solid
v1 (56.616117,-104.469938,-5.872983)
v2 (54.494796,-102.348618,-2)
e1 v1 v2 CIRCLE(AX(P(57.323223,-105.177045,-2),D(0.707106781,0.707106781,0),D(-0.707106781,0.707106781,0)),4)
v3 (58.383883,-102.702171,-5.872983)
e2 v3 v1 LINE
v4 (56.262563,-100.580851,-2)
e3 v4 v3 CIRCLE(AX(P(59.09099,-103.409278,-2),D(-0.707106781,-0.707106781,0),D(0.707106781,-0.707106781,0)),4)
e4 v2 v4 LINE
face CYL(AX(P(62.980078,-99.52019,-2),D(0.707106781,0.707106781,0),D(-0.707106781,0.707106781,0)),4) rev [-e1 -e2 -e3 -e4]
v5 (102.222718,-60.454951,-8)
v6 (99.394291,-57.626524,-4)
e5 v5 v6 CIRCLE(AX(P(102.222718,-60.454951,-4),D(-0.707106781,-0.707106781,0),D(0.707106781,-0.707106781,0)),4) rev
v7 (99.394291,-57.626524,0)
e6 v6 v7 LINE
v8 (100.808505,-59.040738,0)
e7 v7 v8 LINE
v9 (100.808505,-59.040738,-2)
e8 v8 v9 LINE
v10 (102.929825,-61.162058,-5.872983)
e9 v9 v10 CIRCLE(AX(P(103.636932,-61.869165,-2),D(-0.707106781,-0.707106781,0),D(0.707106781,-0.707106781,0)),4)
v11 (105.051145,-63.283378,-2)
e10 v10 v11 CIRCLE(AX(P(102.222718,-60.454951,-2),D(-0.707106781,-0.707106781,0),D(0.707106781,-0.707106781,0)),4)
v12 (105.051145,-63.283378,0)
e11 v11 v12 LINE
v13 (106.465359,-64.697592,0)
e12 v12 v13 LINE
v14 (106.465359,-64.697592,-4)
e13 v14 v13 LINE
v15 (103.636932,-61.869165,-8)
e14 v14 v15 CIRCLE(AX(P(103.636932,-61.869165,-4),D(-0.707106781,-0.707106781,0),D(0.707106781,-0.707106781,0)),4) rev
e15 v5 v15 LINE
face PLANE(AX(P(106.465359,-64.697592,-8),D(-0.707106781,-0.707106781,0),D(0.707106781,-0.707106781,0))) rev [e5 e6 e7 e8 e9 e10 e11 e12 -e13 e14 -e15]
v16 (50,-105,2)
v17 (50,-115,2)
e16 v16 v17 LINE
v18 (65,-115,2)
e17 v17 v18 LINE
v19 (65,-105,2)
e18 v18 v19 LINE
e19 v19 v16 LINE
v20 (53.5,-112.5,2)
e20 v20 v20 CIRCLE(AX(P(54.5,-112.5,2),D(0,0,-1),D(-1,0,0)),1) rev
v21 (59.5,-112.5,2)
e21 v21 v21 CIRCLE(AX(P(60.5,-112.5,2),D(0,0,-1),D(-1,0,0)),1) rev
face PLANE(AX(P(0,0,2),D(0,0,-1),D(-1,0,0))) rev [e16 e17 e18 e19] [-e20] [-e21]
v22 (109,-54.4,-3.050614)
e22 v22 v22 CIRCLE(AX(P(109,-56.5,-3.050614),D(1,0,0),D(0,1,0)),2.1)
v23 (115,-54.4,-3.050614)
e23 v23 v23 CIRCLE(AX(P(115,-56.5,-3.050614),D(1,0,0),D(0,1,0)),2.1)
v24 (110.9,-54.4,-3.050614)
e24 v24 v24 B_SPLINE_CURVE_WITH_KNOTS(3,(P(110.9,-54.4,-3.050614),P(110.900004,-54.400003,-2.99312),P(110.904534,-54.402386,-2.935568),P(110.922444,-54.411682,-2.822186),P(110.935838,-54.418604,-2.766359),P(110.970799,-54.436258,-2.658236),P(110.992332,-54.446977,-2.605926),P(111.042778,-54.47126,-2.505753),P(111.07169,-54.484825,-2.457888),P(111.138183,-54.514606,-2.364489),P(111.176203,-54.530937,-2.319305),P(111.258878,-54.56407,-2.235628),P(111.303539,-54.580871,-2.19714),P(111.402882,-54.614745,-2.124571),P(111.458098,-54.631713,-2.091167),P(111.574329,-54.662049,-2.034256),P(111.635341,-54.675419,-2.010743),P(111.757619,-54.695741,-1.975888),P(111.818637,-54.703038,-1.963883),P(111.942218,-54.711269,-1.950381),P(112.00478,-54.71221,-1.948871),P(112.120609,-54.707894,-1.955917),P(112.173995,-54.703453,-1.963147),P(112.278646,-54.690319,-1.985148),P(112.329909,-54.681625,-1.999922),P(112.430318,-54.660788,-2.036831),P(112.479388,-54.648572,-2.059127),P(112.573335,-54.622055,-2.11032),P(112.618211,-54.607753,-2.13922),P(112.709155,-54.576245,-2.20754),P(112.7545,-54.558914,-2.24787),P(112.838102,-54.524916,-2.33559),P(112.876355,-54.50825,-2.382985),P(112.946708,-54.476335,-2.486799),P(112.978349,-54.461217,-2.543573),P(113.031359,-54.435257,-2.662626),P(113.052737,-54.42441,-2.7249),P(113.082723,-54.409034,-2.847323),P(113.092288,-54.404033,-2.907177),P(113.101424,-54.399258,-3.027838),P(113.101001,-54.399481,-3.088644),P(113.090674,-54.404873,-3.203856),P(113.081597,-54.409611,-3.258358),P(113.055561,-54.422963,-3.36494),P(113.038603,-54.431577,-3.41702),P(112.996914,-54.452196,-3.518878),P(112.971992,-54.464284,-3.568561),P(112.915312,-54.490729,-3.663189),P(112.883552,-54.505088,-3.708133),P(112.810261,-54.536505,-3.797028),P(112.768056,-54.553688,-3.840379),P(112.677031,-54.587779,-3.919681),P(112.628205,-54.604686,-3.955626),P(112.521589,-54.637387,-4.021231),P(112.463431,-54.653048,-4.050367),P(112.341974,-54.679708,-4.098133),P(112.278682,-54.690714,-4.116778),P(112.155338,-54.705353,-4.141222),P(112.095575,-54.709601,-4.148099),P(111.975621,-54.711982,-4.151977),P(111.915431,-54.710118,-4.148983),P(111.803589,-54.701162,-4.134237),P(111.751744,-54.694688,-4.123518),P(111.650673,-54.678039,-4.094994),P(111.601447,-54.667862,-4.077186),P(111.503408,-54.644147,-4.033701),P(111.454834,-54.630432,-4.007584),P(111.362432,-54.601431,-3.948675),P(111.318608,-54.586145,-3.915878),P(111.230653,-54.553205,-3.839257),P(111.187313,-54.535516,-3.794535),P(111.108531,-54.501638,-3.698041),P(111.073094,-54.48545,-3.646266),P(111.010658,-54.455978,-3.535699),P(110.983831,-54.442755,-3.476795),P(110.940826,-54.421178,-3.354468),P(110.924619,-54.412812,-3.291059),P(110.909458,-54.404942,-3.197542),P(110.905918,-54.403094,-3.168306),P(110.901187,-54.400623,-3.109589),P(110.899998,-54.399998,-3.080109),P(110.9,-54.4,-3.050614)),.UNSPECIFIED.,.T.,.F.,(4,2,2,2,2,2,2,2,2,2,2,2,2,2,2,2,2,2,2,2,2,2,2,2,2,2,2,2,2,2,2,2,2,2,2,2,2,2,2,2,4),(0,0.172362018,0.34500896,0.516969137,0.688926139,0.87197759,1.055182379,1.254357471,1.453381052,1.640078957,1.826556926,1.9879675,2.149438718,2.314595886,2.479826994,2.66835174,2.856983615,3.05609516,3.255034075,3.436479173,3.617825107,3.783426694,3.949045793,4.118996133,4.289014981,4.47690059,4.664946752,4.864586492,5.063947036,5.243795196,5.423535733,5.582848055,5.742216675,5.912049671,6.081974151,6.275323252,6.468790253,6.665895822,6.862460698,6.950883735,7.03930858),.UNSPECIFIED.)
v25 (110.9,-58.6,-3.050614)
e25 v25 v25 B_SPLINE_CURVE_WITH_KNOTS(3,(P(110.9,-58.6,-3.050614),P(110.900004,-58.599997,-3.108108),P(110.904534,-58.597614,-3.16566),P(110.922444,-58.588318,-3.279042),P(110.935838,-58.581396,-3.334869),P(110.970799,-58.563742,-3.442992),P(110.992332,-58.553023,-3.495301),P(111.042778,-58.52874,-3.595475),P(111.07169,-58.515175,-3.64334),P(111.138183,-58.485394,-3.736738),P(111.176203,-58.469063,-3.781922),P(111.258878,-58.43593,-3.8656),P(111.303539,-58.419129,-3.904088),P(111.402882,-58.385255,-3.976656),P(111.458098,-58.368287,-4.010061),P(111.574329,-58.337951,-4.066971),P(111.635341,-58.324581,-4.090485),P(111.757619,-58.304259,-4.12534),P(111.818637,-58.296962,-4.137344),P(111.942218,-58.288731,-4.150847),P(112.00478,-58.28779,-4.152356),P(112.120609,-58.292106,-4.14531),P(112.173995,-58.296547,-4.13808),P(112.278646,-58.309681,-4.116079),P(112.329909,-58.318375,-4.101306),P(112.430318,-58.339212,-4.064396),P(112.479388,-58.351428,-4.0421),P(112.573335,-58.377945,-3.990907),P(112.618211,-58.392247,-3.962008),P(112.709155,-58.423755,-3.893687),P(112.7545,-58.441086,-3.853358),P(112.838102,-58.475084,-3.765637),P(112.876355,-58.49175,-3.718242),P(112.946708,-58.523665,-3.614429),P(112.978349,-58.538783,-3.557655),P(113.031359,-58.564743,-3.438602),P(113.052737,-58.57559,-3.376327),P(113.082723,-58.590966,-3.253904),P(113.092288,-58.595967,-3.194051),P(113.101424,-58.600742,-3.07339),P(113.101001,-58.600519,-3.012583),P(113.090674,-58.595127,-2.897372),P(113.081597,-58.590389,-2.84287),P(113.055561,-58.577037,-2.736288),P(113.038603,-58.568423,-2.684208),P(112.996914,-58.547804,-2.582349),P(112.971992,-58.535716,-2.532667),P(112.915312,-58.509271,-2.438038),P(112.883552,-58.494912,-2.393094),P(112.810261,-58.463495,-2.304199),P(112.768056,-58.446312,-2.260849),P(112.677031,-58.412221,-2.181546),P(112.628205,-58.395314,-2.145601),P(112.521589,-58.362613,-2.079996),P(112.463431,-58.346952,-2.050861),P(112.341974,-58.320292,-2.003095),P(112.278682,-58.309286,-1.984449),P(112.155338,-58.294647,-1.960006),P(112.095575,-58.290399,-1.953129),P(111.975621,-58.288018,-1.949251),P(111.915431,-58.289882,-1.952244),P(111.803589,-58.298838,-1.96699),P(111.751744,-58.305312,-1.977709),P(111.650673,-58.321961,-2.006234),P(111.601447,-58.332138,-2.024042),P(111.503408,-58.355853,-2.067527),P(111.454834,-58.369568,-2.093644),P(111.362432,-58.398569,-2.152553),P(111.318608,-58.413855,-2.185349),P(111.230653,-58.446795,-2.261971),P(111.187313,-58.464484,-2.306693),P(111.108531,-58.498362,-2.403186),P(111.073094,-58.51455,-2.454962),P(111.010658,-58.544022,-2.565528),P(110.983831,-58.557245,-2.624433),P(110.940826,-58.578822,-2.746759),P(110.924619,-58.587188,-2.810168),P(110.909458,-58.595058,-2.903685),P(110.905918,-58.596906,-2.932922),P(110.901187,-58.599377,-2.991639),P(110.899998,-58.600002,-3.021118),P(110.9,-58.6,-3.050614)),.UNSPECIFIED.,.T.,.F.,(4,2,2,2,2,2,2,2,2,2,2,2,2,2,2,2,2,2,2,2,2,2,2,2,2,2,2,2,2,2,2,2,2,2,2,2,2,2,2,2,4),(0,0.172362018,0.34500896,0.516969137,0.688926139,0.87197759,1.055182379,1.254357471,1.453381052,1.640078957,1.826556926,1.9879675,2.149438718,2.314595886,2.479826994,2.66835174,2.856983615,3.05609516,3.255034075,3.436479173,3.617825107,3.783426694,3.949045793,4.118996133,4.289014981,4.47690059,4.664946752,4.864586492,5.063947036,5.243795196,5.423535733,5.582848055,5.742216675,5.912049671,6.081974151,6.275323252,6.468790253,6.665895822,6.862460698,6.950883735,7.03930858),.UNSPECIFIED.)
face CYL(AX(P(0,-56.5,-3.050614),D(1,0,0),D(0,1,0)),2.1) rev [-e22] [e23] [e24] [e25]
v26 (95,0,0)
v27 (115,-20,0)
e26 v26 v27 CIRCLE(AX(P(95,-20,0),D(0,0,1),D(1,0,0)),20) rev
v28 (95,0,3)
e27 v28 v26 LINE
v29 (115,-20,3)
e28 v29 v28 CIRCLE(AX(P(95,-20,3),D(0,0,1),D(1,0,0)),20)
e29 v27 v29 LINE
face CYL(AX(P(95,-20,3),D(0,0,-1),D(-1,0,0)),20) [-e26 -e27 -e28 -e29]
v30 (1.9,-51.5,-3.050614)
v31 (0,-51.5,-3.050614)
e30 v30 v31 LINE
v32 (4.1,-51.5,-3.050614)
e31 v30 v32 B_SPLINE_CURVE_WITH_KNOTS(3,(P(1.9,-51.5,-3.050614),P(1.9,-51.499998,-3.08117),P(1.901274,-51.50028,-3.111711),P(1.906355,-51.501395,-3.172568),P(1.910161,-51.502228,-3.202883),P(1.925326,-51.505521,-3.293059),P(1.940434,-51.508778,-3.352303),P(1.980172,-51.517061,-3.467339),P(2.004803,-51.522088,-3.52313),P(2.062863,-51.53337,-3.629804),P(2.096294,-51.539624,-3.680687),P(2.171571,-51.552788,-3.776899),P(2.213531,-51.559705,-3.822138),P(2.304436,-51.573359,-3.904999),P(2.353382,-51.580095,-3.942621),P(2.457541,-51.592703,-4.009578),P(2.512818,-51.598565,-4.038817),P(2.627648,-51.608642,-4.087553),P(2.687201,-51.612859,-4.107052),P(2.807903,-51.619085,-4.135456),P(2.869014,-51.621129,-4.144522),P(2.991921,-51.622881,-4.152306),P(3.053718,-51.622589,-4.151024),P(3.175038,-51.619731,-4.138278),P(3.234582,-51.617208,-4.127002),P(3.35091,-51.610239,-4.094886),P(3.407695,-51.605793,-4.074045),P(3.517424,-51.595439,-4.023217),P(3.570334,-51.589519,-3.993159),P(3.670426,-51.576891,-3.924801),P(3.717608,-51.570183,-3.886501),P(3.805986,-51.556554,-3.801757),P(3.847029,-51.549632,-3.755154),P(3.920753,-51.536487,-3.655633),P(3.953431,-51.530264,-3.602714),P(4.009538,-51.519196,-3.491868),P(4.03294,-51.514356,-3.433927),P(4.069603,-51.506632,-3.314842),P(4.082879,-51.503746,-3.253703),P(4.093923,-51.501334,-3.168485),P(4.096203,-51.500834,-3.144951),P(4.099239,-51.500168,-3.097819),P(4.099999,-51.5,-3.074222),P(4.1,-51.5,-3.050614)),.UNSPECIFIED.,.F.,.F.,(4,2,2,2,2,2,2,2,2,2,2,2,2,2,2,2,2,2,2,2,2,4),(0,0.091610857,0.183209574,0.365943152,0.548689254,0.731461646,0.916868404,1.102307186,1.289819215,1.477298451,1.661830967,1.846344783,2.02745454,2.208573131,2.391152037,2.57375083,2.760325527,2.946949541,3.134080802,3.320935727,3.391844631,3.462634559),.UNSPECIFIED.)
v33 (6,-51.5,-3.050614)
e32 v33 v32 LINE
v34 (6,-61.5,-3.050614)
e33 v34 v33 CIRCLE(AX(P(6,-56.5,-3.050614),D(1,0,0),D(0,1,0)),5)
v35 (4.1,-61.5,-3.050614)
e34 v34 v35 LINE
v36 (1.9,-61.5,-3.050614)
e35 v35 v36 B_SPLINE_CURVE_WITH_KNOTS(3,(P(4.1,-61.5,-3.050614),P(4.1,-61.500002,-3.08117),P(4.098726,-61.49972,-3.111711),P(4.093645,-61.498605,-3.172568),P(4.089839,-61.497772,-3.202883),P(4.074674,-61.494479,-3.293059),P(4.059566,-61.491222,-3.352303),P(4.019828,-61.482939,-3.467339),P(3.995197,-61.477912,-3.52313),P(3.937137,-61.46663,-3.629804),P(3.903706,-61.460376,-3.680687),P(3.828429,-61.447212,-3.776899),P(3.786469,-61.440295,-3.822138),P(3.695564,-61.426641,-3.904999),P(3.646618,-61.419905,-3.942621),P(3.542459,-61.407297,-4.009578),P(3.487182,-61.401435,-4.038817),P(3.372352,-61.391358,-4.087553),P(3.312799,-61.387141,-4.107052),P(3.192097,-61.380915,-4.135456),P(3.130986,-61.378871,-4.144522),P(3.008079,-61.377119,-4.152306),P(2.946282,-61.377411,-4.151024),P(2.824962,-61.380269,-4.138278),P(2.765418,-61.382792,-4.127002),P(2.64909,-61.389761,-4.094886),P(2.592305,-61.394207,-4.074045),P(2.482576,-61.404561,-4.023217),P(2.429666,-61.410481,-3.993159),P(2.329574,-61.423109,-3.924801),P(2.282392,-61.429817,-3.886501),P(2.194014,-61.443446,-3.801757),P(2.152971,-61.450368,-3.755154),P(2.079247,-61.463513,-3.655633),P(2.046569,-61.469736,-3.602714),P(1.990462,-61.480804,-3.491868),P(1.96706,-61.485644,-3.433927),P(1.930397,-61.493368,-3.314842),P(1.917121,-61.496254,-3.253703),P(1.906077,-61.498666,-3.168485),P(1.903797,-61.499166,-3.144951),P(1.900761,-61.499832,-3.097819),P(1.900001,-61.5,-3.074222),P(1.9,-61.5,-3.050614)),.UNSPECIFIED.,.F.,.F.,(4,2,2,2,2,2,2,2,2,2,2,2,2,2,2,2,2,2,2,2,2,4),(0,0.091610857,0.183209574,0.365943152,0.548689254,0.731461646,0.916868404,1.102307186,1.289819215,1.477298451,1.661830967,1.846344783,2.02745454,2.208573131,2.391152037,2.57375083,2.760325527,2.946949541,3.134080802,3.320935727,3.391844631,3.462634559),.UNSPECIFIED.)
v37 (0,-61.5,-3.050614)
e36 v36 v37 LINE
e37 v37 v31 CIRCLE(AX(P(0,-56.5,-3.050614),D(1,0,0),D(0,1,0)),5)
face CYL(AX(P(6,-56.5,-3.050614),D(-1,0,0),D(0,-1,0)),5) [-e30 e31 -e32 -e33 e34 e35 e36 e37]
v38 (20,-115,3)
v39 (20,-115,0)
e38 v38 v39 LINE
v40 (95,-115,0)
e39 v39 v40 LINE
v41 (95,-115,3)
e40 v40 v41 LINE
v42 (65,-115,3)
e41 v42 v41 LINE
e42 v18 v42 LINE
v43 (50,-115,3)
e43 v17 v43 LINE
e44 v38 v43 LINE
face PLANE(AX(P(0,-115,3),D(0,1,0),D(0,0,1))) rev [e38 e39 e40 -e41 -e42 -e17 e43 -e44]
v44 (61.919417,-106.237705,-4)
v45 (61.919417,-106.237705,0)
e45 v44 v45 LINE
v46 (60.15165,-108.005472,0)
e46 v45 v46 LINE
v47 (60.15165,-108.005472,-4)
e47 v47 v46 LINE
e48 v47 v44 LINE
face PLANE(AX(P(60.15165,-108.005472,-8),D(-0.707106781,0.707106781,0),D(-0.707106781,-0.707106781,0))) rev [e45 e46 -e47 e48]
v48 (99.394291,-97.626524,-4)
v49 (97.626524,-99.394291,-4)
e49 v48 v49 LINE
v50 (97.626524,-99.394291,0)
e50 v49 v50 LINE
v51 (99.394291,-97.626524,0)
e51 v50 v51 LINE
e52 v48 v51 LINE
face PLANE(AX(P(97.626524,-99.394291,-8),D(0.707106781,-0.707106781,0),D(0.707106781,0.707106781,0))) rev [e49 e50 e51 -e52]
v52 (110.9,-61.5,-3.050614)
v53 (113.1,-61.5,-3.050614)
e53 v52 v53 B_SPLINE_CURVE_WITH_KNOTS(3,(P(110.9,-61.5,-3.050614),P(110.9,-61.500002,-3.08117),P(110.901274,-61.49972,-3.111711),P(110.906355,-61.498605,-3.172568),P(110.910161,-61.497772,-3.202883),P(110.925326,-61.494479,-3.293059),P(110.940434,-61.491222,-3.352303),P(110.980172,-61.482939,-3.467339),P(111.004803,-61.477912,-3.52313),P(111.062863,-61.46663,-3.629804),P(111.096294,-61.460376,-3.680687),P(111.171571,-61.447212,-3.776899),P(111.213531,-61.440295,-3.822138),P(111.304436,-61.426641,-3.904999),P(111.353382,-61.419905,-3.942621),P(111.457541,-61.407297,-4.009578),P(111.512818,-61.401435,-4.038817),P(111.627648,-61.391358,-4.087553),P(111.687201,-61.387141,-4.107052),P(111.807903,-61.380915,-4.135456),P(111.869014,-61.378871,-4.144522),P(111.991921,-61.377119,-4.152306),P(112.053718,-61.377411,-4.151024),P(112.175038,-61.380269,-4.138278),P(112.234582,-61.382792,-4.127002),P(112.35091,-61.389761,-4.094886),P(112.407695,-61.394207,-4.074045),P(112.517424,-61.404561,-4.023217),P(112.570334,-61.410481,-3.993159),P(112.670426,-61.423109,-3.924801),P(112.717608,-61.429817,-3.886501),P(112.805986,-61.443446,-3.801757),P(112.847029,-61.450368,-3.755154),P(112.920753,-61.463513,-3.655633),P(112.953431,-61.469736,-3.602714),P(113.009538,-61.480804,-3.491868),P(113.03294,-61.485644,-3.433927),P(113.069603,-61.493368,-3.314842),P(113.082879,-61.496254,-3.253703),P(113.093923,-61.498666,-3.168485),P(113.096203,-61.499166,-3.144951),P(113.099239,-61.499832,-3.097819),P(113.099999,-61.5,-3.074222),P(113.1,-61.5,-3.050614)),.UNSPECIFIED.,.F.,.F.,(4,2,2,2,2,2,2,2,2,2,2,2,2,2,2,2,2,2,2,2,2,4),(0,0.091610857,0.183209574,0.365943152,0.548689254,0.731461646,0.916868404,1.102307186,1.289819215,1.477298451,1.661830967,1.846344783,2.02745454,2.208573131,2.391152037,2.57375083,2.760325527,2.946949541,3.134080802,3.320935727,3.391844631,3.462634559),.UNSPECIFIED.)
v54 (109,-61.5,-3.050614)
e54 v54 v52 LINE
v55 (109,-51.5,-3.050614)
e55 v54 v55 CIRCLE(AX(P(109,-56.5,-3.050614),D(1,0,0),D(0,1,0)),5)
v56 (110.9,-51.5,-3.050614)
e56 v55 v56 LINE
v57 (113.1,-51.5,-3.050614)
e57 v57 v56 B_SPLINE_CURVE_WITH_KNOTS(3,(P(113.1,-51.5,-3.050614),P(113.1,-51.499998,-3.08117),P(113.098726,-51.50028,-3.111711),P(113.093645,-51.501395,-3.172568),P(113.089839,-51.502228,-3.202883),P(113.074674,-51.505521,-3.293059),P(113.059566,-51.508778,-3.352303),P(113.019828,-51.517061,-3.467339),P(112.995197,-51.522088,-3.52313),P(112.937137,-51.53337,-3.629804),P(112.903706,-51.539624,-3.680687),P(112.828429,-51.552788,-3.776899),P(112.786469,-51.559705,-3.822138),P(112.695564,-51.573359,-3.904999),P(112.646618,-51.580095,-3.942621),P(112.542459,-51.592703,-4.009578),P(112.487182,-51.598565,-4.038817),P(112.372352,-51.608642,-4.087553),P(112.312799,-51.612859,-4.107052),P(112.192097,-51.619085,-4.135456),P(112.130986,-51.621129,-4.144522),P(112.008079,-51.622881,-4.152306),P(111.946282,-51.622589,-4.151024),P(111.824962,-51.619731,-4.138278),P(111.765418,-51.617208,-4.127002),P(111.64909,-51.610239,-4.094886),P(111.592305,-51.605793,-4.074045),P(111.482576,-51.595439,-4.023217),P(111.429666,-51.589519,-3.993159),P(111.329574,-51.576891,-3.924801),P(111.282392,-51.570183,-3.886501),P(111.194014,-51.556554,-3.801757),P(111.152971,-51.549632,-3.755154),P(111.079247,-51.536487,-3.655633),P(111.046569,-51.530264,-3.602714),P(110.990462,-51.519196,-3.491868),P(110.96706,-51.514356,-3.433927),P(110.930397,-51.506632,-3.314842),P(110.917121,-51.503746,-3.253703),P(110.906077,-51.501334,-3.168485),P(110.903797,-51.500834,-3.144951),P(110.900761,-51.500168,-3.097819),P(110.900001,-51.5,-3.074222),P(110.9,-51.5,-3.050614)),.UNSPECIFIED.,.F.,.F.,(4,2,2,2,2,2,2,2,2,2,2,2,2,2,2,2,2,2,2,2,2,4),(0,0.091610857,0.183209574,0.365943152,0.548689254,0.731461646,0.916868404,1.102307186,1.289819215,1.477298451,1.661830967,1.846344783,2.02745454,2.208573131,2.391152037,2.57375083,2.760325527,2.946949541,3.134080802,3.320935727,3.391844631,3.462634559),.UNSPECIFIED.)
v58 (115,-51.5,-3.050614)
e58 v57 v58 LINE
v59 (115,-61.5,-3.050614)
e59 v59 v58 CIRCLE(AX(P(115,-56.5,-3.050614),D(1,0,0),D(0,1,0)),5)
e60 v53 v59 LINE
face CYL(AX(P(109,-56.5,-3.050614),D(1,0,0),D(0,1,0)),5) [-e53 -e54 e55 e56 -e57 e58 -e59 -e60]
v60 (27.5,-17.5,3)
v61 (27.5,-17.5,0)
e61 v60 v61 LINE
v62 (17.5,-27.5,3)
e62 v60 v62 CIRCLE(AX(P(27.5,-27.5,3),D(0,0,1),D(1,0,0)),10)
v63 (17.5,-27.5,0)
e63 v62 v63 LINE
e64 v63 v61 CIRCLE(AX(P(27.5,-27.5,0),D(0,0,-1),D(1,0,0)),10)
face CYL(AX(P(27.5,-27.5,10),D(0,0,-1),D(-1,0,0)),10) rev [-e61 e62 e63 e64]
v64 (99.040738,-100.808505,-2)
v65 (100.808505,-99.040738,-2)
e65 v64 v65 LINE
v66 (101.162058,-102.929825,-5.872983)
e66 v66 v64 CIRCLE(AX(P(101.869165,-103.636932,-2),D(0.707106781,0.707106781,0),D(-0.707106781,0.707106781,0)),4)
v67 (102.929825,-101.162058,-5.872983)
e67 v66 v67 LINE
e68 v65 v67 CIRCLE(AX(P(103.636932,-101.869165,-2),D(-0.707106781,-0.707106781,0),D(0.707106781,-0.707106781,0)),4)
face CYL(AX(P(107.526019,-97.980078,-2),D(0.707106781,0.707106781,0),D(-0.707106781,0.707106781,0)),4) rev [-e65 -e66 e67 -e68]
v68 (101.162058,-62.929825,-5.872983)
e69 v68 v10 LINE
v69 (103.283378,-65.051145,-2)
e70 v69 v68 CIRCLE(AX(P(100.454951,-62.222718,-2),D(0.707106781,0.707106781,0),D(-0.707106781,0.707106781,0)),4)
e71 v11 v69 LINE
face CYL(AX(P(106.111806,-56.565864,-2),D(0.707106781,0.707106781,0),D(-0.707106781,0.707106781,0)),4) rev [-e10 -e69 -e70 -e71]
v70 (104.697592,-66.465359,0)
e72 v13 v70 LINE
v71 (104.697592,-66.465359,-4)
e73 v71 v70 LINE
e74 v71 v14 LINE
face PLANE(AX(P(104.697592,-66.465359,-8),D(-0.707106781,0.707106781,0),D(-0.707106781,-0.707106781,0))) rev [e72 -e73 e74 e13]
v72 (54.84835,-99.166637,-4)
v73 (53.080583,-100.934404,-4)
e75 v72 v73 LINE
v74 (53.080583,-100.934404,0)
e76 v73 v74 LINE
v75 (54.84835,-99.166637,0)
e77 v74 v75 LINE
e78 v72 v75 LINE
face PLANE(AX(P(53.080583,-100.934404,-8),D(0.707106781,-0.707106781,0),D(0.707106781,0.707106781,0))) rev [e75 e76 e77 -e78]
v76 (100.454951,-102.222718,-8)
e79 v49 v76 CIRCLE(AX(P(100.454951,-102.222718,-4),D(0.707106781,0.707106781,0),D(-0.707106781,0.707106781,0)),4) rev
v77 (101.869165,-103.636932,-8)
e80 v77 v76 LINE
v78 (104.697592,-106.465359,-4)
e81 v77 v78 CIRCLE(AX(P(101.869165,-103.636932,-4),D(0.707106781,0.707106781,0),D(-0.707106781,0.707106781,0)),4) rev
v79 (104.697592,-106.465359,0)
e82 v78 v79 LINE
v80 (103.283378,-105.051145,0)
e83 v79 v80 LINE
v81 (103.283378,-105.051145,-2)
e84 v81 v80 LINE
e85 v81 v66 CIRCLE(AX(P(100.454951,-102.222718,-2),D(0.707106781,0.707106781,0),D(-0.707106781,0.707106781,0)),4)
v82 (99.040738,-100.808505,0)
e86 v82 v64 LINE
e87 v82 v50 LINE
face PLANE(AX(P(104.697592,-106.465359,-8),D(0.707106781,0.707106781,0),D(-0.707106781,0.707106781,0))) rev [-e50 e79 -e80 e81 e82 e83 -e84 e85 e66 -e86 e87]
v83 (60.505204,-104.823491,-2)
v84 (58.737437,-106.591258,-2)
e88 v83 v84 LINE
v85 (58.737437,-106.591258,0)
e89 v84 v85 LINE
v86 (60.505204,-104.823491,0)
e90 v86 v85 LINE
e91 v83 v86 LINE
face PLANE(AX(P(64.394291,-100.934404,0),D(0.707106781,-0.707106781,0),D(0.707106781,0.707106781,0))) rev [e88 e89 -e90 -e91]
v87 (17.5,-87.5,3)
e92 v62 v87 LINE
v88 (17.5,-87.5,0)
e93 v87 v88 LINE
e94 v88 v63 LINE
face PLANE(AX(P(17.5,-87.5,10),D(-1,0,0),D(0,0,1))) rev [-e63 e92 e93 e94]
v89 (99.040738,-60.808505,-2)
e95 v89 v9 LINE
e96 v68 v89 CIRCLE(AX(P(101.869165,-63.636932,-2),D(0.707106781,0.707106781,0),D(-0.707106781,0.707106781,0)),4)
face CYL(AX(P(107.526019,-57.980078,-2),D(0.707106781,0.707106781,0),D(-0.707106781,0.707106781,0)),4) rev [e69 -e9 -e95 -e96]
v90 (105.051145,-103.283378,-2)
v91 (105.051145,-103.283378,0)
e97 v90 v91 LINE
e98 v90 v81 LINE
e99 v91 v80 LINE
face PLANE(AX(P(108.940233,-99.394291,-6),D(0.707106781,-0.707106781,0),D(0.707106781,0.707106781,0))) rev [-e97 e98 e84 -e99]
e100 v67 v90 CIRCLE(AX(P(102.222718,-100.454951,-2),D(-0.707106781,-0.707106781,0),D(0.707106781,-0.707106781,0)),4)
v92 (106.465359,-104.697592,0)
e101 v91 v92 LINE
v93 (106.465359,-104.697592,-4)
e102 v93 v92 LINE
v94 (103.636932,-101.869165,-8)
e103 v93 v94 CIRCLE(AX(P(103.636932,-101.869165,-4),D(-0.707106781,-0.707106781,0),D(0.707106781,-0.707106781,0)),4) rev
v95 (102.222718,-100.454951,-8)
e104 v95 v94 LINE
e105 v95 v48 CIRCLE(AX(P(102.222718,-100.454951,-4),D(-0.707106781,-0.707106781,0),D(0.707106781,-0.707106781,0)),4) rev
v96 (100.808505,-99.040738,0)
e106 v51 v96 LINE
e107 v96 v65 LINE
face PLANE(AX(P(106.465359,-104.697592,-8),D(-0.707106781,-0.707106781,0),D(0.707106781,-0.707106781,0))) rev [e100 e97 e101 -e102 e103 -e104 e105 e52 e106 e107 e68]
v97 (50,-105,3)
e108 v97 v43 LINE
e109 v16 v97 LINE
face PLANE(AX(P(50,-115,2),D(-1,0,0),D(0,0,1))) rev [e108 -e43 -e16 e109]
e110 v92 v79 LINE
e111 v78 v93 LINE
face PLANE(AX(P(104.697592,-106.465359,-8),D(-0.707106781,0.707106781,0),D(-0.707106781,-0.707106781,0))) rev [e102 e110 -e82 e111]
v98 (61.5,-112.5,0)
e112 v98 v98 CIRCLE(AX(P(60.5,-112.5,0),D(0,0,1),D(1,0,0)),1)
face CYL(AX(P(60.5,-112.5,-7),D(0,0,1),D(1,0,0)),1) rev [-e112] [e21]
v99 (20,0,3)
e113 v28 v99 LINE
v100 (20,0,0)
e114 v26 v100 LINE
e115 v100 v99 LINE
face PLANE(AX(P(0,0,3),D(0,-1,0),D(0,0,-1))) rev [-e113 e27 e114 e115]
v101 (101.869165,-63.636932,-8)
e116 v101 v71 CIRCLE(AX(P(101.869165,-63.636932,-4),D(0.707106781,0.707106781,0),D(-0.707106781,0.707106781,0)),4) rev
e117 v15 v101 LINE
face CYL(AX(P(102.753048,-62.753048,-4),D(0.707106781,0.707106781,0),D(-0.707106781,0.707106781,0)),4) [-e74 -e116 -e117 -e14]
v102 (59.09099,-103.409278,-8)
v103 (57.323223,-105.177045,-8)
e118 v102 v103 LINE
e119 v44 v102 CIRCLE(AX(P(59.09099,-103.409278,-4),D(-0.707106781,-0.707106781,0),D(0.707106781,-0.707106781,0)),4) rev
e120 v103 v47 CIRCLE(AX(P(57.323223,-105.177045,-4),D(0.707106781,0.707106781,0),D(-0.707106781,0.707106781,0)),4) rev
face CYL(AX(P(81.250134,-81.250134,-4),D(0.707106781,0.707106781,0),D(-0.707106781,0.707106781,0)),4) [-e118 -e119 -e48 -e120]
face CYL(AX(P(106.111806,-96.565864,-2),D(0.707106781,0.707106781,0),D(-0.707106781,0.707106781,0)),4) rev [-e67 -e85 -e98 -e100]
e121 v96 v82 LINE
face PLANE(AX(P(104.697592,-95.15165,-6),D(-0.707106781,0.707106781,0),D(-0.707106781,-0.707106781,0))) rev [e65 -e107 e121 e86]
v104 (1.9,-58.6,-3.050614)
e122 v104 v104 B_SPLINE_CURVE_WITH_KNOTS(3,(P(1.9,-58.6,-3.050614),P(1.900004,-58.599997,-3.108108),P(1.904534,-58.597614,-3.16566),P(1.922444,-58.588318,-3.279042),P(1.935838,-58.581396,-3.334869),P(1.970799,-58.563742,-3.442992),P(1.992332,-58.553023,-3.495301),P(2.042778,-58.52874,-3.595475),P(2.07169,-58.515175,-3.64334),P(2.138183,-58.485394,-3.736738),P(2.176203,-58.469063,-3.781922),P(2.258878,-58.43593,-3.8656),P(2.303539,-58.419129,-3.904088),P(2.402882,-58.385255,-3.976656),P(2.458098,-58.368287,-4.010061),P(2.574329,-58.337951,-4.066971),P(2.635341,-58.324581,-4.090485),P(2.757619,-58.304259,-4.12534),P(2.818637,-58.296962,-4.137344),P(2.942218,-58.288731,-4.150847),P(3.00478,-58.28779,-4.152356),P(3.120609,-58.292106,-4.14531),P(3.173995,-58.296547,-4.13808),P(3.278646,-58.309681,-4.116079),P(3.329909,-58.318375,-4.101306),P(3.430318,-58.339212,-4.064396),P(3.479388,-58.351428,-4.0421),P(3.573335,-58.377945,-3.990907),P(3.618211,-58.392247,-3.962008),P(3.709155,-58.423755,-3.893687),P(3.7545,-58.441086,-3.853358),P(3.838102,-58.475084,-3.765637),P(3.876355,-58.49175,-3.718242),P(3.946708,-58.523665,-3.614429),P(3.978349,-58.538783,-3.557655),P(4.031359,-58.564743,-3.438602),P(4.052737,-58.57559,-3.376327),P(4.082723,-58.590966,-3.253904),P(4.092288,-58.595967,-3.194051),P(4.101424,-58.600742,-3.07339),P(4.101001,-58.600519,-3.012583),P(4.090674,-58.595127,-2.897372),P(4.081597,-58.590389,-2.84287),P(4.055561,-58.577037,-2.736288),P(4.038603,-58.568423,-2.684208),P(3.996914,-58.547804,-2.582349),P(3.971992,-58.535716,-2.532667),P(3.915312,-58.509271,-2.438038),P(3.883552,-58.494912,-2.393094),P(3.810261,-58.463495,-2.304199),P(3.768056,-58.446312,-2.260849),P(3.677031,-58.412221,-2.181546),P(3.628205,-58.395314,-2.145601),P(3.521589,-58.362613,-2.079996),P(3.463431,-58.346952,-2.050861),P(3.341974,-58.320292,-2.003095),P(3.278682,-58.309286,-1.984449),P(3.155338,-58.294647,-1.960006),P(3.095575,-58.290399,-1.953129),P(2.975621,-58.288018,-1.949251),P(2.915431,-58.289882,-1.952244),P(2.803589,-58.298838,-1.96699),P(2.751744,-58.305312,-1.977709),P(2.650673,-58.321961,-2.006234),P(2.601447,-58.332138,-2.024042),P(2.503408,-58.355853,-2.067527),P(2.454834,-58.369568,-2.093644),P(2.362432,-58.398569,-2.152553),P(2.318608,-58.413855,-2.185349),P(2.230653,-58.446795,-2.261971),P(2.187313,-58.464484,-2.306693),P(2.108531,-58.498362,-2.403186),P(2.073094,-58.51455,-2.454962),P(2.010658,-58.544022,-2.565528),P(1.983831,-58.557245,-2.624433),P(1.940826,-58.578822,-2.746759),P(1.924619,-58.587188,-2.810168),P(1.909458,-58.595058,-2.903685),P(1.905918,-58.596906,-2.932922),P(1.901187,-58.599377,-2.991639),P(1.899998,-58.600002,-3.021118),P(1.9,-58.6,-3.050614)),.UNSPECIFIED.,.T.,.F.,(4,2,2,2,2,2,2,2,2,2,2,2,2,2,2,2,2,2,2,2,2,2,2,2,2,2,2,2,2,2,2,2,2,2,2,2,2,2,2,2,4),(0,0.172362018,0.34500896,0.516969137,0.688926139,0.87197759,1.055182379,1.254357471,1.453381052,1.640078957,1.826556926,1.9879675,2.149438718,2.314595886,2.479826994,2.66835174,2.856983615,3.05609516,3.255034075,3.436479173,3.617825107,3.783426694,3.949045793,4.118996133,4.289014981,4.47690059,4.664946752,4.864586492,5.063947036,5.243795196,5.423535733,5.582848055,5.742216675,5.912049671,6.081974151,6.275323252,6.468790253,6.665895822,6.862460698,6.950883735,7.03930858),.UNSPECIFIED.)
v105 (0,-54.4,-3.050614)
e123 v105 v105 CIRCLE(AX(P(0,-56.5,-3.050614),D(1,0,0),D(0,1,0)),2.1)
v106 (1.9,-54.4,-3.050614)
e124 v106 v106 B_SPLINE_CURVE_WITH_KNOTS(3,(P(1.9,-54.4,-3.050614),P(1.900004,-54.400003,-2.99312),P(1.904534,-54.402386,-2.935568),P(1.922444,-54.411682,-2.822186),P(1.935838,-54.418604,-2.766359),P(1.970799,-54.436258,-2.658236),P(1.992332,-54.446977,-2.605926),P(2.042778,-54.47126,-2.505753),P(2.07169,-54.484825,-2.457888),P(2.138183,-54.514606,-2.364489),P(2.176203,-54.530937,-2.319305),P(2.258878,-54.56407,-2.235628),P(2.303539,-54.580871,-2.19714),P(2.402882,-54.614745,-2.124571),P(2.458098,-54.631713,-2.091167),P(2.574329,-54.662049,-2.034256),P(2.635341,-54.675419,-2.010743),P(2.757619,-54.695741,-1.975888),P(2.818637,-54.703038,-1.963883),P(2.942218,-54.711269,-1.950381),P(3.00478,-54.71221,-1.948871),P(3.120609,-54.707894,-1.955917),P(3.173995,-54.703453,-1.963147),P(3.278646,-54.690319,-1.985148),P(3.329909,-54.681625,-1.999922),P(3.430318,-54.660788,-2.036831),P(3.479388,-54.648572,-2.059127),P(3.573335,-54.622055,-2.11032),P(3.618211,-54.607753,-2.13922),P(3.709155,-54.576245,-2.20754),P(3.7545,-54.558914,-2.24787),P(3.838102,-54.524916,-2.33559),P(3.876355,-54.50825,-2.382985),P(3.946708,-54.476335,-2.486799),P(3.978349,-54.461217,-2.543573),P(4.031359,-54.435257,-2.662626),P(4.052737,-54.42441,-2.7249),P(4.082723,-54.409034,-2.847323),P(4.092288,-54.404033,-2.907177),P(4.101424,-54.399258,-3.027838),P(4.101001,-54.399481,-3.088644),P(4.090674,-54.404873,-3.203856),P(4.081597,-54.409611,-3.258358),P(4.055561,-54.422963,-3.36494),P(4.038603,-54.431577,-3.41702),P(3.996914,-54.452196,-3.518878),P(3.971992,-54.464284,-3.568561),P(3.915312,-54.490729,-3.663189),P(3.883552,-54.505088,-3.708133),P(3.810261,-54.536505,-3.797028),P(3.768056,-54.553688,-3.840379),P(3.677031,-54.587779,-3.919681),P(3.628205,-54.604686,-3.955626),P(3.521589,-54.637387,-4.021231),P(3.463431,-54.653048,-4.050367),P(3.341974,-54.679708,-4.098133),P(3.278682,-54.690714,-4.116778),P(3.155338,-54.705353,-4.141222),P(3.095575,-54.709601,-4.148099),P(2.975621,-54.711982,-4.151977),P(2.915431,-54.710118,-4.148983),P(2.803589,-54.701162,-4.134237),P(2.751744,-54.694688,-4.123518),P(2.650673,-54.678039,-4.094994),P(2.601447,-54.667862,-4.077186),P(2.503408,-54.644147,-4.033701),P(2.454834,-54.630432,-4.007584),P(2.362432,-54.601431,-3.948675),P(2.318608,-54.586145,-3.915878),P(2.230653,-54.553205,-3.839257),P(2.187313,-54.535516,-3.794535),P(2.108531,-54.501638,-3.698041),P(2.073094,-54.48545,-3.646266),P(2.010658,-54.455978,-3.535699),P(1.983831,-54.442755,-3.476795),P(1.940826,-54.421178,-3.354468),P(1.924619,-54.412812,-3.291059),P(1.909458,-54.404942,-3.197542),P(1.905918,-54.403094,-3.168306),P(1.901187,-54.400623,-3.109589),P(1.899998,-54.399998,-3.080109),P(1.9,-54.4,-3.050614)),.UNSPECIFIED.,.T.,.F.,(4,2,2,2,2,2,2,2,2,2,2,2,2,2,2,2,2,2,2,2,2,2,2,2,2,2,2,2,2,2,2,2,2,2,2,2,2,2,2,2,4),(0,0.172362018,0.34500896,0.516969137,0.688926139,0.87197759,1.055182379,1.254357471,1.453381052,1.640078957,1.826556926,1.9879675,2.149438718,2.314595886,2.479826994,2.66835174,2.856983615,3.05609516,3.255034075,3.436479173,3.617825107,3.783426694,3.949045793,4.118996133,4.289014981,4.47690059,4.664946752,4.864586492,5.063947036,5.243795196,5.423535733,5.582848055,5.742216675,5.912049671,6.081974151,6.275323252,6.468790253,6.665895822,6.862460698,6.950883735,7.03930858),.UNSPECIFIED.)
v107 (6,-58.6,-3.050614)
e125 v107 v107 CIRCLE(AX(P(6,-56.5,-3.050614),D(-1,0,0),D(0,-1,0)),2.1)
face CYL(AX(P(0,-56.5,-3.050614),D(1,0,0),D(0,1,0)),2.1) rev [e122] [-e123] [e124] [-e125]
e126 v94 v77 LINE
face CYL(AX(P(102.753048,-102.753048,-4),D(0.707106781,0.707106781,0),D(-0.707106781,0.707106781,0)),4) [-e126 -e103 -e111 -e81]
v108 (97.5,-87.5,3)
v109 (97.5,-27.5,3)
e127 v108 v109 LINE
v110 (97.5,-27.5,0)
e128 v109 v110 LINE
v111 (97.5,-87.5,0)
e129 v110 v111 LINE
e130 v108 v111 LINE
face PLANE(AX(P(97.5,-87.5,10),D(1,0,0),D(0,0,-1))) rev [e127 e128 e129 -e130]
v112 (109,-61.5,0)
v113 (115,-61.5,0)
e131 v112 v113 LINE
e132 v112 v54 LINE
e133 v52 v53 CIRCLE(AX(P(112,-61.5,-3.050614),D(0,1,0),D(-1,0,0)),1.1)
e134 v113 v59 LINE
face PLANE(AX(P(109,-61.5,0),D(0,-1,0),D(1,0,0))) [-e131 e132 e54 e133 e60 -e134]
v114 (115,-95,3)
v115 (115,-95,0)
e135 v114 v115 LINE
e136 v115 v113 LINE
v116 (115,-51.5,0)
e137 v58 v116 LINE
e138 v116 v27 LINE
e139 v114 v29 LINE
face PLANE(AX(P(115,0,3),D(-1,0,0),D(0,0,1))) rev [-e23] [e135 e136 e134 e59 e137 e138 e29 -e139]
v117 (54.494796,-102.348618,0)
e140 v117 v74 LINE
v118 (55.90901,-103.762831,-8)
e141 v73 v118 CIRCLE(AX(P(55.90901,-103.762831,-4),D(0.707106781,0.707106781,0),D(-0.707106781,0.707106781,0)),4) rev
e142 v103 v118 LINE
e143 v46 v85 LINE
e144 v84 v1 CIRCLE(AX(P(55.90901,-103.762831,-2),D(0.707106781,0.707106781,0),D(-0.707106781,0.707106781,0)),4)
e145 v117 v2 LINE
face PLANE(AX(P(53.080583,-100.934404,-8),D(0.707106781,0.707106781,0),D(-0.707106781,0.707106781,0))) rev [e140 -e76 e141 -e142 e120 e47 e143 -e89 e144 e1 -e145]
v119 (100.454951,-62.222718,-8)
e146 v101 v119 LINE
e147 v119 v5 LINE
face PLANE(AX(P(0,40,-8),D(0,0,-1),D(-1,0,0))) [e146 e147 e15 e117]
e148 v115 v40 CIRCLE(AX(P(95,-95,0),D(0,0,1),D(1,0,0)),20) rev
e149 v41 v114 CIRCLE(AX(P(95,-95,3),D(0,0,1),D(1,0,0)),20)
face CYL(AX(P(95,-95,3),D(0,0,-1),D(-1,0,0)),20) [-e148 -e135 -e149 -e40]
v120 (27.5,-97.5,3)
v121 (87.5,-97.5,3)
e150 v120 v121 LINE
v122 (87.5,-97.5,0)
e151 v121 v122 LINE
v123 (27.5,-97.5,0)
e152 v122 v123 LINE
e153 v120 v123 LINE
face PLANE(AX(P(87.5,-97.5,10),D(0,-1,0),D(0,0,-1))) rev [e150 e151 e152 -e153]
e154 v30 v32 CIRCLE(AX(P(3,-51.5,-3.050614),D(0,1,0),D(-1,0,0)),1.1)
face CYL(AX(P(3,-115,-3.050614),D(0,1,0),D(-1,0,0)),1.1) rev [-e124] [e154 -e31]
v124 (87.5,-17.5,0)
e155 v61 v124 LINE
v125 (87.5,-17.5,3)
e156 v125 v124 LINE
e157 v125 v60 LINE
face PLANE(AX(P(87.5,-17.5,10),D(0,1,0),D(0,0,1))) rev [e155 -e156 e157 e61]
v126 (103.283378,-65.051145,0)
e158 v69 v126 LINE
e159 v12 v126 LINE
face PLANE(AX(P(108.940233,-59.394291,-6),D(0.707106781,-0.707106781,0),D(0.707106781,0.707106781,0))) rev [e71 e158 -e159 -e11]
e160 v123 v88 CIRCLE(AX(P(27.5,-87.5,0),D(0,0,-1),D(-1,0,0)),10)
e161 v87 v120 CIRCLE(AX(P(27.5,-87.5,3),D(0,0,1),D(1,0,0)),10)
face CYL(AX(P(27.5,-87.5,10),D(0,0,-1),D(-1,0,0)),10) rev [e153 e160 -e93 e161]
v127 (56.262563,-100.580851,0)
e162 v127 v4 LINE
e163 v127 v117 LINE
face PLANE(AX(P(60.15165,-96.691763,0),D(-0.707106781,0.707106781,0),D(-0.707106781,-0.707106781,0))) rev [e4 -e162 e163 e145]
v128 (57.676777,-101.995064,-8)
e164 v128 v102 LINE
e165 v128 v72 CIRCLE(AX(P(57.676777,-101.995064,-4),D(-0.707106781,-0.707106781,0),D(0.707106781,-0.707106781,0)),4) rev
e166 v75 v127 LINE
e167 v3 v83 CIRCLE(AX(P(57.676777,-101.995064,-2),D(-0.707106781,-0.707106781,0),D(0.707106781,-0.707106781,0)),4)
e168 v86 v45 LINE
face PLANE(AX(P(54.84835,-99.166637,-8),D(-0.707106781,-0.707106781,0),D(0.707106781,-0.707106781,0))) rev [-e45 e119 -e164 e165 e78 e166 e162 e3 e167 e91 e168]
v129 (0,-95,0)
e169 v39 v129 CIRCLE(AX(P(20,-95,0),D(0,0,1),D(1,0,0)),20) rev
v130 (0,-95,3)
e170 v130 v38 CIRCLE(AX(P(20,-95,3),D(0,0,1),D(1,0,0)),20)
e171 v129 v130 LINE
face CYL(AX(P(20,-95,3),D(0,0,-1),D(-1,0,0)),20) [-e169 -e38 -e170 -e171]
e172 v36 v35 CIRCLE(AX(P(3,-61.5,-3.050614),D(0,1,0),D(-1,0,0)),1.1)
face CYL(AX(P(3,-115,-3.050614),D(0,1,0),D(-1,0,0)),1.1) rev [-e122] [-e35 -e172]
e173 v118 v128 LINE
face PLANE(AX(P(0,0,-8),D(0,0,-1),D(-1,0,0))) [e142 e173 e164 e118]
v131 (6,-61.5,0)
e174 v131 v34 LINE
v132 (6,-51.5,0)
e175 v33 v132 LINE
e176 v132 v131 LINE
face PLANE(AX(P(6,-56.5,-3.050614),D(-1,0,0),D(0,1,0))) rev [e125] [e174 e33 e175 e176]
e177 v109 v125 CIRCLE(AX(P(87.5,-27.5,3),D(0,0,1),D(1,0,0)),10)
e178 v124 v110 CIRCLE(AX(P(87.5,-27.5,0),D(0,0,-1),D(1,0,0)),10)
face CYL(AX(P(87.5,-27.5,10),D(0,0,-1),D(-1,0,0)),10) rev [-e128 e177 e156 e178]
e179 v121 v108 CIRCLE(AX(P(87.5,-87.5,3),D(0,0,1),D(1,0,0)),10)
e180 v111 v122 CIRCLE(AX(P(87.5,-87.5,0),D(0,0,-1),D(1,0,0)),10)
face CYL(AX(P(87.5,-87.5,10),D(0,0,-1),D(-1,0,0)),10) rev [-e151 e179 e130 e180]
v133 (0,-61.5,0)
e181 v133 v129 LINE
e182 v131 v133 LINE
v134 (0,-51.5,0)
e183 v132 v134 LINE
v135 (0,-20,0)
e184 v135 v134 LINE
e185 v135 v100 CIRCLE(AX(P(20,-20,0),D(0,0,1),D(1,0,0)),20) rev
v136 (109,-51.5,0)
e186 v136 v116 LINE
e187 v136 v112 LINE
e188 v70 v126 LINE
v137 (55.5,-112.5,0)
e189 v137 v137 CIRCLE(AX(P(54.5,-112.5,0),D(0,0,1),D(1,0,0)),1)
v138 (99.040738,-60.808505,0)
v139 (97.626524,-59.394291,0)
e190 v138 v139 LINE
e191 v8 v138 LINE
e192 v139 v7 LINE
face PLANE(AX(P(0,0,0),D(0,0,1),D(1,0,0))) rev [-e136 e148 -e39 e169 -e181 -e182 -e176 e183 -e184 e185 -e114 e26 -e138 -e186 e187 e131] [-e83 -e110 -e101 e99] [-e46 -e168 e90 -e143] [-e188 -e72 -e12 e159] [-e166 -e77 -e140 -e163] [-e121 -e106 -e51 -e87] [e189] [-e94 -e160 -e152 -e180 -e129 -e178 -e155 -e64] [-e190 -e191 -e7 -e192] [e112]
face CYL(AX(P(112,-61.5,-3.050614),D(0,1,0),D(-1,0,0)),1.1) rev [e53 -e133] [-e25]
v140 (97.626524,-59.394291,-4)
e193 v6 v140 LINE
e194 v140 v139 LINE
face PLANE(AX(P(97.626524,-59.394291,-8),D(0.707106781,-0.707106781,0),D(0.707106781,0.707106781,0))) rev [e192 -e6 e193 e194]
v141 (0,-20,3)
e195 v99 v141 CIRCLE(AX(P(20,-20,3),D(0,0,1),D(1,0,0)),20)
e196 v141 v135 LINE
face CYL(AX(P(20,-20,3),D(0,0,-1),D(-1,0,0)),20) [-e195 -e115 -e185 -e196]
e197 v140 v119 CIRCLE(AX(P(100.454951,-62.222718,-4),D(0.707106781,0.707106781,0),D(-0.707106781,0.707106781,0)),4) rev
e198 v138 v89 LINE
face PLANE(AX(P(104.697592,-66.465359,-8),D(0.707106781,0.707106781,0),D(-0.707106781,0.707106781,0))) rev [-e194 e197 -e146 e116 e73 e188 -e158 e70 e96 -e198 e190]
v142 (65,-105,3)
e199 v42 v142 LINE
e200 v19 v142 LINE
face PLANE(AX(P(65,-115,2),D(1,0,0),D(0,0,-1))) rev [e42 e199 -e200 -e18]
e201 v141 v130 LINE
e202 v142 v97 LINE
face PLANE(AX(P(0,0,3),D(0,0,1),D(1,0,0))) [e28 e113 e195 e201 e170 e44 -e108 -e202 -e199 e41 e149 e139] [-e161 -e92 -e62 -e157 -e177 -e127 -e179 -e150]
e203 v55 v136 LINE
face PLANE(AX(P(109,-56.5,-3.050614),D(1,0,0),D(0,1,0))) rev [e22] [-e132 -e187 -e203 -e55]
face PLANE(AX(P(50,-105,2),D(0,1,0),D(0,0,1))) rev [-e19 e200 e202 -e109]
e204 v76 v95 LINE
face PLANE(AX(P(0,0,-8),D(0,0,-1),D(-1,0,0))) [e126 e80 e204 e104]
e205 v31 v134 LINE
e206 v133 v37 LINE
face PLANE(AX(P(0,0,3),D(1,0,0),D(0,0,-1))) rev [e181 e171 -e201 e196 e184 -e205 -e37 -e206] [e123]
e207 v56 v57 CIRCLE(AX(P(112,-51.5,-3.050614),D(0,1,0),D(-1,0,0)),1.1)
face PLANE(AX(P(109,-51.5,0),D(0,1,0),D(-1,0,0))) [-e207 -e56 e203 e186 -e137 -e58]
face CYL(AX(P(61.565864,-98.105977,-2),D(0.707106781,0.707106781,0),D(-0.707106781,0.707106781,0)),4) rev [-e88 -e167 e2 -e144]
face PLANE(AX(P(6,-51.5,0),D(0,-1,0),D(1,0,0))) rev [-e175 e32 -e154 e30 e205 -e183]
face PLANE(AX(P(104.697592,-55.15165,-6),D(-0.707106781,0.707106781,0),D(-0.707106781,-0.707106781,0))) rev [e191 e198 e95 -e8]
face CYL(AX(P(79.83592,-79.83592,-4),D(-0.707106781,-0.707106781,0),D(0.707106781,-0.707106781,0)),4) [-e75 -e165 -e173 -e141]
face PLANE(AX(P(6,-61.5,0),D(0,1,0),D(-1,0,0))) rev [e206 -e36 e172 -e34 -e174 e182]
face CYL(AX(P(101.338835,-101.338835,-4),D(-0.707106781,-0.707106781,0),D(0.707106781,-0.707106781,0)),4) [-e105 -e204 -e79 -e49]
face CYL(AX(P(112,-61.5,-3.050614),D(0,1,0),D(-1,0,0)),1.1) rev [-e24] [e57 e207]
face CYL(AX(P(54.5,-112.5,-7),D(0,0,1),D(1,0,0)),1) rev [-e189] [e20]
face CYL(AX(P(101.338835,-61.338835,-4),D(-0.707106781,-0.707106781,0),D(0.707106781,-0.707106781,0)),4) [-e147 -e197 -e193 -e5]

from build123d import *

# Parameters (mm, degrees)
SZKIC1_W                    = 115
SZKIC1_H                    = 115
DODANIE_WYCI_GNI_CIE1_DEPTH = 3
DODANIE_WYCI_GNI_CIE2_DEPTH = 6
SZKIC5_R                    = 2.1
WYTNIJ_WYCI_GNI_CIE1_DEPTH  = 163.833695476
SZKIC6_R                    = 1
WYTNIJ_WYCI_GNI_CIE2_DEPTH  = 10
ZAOKR_GLENIE1_R             = 20
SZKIC7_W                    = 15
SZKIC7_H                    = 10
WYTNIJ_WYCI_GNI_CIE3_DEPTH  = 1
WYTNIJ_WYCI_GNI_CIE4_DEPTH  = 10
SZKIC9_R                    = 1.1
WYTNIJ_WYCI_GNI_CIE5_DEPTH  = 132.613306252
SZKIC10_R                   = 1.1
WYTNIJ_WYCI_GNI_CIE6_DEPTH  = 10
DODANIE_WYCI_GNI_CIE4_DEPTH = 8
SZKIC14_W                   = 6
SZKIC14_H                   = 6
WYTNIJ_WYCI_GNI_CIE8_DEPTH  = 8
ZAOKR_GLENIE3_R             = 4
DODANIE_WYCI_GNI_CIE5_DEPTH = 8
SZKIC16_W                   = 6
SZKIC16_H                   = 6
WYTNIJ_WYCI_GNI_CIE9_DEPTH  = 8
ZAOKR_GLENIE5_R             = 4
SZYK_START                  = 27.034271247
SZYK_LINIOWY1_DEPTH         = 2.5


# Read off the part's stored shape, not the designer's step: Szyk liniowy1
with BuildPart() as part:
    # Szkic1 → Dodanie-wyciągnięcie1 (new body)
    with BuildSketch(Plane.XY):
        with Locations((57.5, -57.5)):
            Rectangle(SZKIC1_W, SZKIC1_H)
    extrude(amount=DODANIE_WYCI_GNI_CIE1_DEPTH)

    # Szkic3 → Dodanie-wyciągnięcie2 (add)
    with BuildSketch(Plane(origin=(115, 0, 0), x_dir=(0, 0, -1), z_dir=(1, 0, 0))):
        with BuildLine():
            Line((0, -51.5), (3.050613798, -51.5))
            ThreePointArc((3.050613798, -51.5), (8.050613798, -56.5), (3.050613798, -61.5))
            Line((3.050613798, -61.5), (0, -61.5))
            Line((0, -61.5), (0, -51.5))
        make_face()
    dodanie_wyci_gni_cie2 = extrude(amount=-DODANIE_WYCI_GNI_CIE2_DEPTH)

    # Lustro1: Dodanie-wyciągnięcie2 across plane
    add(dodanie_wyci_gni_cie2.mirror(Plane(origin=(57.5, 0, 0), x_dir=(0, 0, 1), z_dir=(1, 0, 0))))

    # Szkic5 → Wytnij-wyciągnięcie1 (cut, through all)
    with BuildSketch(Plane(origin=(115, 0, 0), x_dir=(0, 0, -1), z_dir=(1, 0, 0))):
        with Locations(Location((3.050613798, -56.5, 0), (0, 0, 90))):
            Circle(SZKIC5_R)
    extrude(amount=-WYTNIJ_WYCI_GNI_CIE1_DEPTH, mode=Mode.SUBTRACT)

    # Szkic6 → Wytnij-wyciągnięcie2 (cut)
    with BuildSketch(Plane.XY.offset(3)):
        with Locations((54.5, -112.5)):
            Circle(SZKIC6_R)
        with Locations((60.5, -112.5)):
            Circle(SZKIC6_R)
    extrude(amount=-WYTNIJ_WYCI_GNI_CIE2_DEPTH, mode=Mode.SUBTRACT)

    # Zaokrąglenie1
    zaokr_glenie1_edges = [part.edges().sort_by_distance(p)[0] for p in [
        (0, 0, 1.5),
        (115, 0, 1.5),
        (115, -115, 1.5),
        (0, -115, 1.5),
    ]]
    fillet(zaokr_glenie1_edges, radius=ZAOKR_GLENIE1_R)

    # Szkic7 → Wytnij-wyciągnięcie3 (cut)
    with BuildSketch(Plane.XY.offset(3)):
        with Locations((57.5, -110)):
            Rectangle(SZKIC7_W, SZKIC7_H)
    extrude(amount=-WYTNIJ_WYCI_GNI_CIE3_DEPTH, mode=Mode.SUBTRACT)

    # Szkic8 → Wytnij-wyciągnięcie4 (cut)
    with BuildSketch(Plane(origin=(0, 0, 0), x_dir=(-1, 0, 0), z_dir=(0, 0, -1))):
        with BuildLine():
            Line((-87.5, -97.5), (-27.5, -97.5))
            ThreePointArc((-27.5, -97.5), (-20.428932188, -94.571067812), (-17.5, -87.5))
            Line((-17.5, -87.5), (-17.5, -27.5))
            ThreePointArc((-17.5, -27.5), (-20.428932188, -20.428932188), (-27.5, -17.5))
            Line((-27.5, -17.5), (-87.5, -17.5))
            ThreePointArc((-87.5, -17.5), (-94.571067812, -20.428932188), (-97.5, -27.5))
            Line((-97.5, -27.5), (-97.5, -87.5))
            ThreePointArc((-97.5, -87.5), (-94.571067812, -94.571067812), (-87.5, -97.5))
        make_face()
    extrude(amount=-WYTNIJ_WYCI_GNI_CIE4_DEPTH, mode=Mode.SUBTRACT)

    # Szkic9 → Wytnij-wyciągnięcie5 (cut, through all)
    with BuildSketch(Plane(origin=(0, -51.5, 0), x_dir=(1, 0, 0), z_dir=(0, 1, 0))):
        with Locations(Location((3, 3.050613798, 0), (0, 0, 180))):
            Circle(SZKIC9_R)
    extrude(amount=-WYTNIJ_WYCI_GNI_CIE5_DEPTH, mode=Mode.SUBTRACT)

    # Szkic10 → Wytnij-wyciągnięcie6 (cut)
    with BuildSketch(Plane(origin=(0, -51.5, 0), x_dir=(1, 0, 0), z_dir=(0, 1, 0))):
        with Locations(Location((112, 3.050613798, 0), (0, 0, 180))):
            Circle(SZKIC10_R)
    extrude(amount=-WYTNIJ_WYCI_GNI_CIE6_DEPTH, mode=Mode.SUBTRACT)

    # Szkic13 → Dodanie-wyciągnięcie4 (add)
    with BuildSketch(Plane(origin=(0, 2.663945597, 0), x_dir=(-1, 0, 0), z_dir=(0, 0, -1))):
        Polygon((-53.080582618, -103.598349571), (-60.151650429, -110.669417382), (-61.919417382, -108.901650429), (-54.848349571, -101.830582618), align=None)
    extrude(amount=DODANIE_WYCI_GNI_CIE4_DEPTH)

    # Szkic14 → Wytnij-wyciągnięcie8 (cut)
    with BuildSketch(Plane(origin=(-25.258883476, -22.594937879, 0), x_dir=(-0.7071067811865481, 0.707106781186547, 0), z_dir=(-0.707106781186547, -0.7071067811865481, 0))):
        with Locations((-115.788735419, 3)):
            Rectangle(SZKIC14_W, SZKIC14_H)
    extrude(amount=-WYTNIJ_WYCI_GNI_CIE8_DEPTH, mode=Mode.SUBTRACT)

    # Zaokrąglenie3
    # the kernel refuses this fillet: 4 mm, written as the material it adds along each edge
    with BuildSketch(Plane(origin=(58.737436867, -106.591258223, -6), x_dir=(0, 0, 1), z_dir=(0.707106781186547, 0.7071067811865481, 0)), Plane(origin=(54.49479618, -102.348617536, -6), x_dir=(0.7071067811865481, -0.707106781186547, 0), z_dir=(0.707106781186547, 0.7071067811865481, 0))) as zaokr_glenie3_piece_1:
        with BuildLine():
            CenterArc((ZAOKR_GLENIE3_R, -ZAOKR_GLENIE3_R), ZAOKR_GLENIE3_R, 90, 90)
            Line((0, -ZAOKR_GLENIE3_R), (0, 0))
            Line((0, 0), (ZAOKR_GLENIE3_R, 0))
        make_face()
    extrude(amount=2.5)
    # the kernel refuses this fillet: 4 mm, written as the material it takes off along each edge
    with BuildSketch(Plane(origin=(53.080582618, -115.076539597, -8), x_dir=(0, 0, 1), z_dir=(0.7071067811865476, 0.7071067811865476, 0)), Plane(origin=(61.919417382, -92.095569208, -8), x_dir=(0, 0, 1), z_dir=(-0.7071067811865476, -0.7071067811865476, 0))) as zaokr_glenie3_2_piece_1:
        with BuildLine():
            CenterArc((ZAOKR_GLENIE3_R, -ZAOKR_GLENIE3_R), ZAOKR_GLENIE3_R, 90, 90)
            Line((0, -ZAOKR_GLENIE3_R), (0, 0))
            Line((0, 0), (ZAOKR_GLENIE3_R, 0))
        make_face()
    extrude(amount=22.5, mode=Mode.SUBTRACT)

    # Szkic15 → Dodanie-wyciągnięcie5 (add)
    with BuildSketch(Plane(origin=(0, 0, 0), x_dir=(-1, 0, 0), z_dir=(0, 0, -1))):
        Polygon((-104.697591975, -106.465358928), (-106.465358928, -104.697591975), (-99.394291117, -97.626524164), (-97.626524164, -99.394291117), align=None)
    extrude(amount=DODANIE_WYCI_GNI_CIE5_DEPTH)

    # Szkic16 → Wytnij-wyciągnięcie9 (cut)
    with BuildSketch(Plane(origin=(-0.883883476, -0.883883476, 0), x_dir=(-0.7071067811865475, 0.7071067811865477, 0), z_dir=(-0.7071067811865477, -0.7071067811865475, 0))):
        with Locations((-144.31475452, 3)):
            Rectangle(SZKIC16_W, SZKIC16_H)
    extrude(amount=-WYTNIJ_WYCI_GNI_CIE9_DEPTH, mode=Mode.SUBTRACT)

    # Zaokrąglenie5
    # the kernel refuses this fillet: 4 mm, written as the material it adds along each edge
    with BuildSketch(Plane(origin=(99.040737726, -100.808504679, -6), x_dir=(0.7071067811865475, -0.7071067811865477, 0), z_dir=(0.7071067811865477, 0.7071067811865475, 0)), Plane(origin=(103.283378413, -105.051145366, -6), x_dir=(0, 0, 1), z_dir=(0.7071067811865477, 0.7071067811865475, 0))) as zaokr_glenie5_piece_1:
        with BuildLine():
            CenterArc((ZAOKR_GLENIE5_R, -ZAOKR_GLENIE5_R), ZAOKR_GLENIE5_R, 90, 90)
            Line((0, -ZAOKR_GLENIE5_R), (0, 0))
            Line((0, 0), (ZAOKR_GLENIE5_R, 0))
        make_face()
    extrude(amount=2.5)
    # the kernel refuses this fillet: 4 mm, written as the material it takes off along each edge
    with BuildSketch(Plane(origin=(106.465358928, -90.555456352, -8), x_dir=(0, 0, 1), z_dir=(-0.7071067811865476, -0.7071067811865476, 0)), Plane(origin=(97.626524164, -113.53642674, -8), x_dir=(0, 0, 1), z_dir=(0.7071067811865476, 0.7071067811865476, 0))) as zaokr_glenie5_2_piece_1:
        with BuildLine():
            CenterArc((ZAOKR_GLENIE5_R, -ZAOKR_GLENIE5_R), ZAOKR_GLENIE5_R, 90, 90)
            Line((0, -ZAOKR_GLENIE5_R), (0, 0))
            Line((0, 0), (ZAOKR_GLENIE5_R, 0))
        make_face()
    extrude(amount=22.5, mode=Mode.SUBTRACT)

    # Szyk liniowy1 outline → Szyk liniowy1 (add)
    with BuildSketch(Plane(origin=(0, 0, 0), x_dir=(0.7071067811865471, -0.707106781186548, 0), z_dir=(0.707106781186548, 0.707106781186547, 0)).offset(SZYK_START)):
        with BuildLine():
            ThreePointArc((121.030483272, 4), (119.858910397, 6.828427125), (117.030483272, 8))
            Line((117.030483272, 8), (115.030483272, 8))
            ThreePointArc((115.030483272, 8), (112.202056147, 6.828427125), (111.030483272, 4))
            Line((111.030483272, 4), (111.030483272, 0))
            Line((111.030483272, 0), (113.030483272, 0))
            Line((113.030483272, 0), (113.030483272, 2))
            ThreePointArc((113.030483272, 2), (113.868205612, 4.449489743), (116.030483272, 5.872983346))
            ThreePointArc((116.030483272, 5.872983346), (118.192760932, 4.449489743), (119.030483272, 2))
            Line((119.030483272, 2), (119.030483272, 0))
            Line((119.030483272, 0), (121.030483272, 0))
            Line((121.030483272, 0), (121.030483272, 4))
        make_face()
    extrude(amount=SZYK_LINIOWY1_DEPTH)


solid = part.part
